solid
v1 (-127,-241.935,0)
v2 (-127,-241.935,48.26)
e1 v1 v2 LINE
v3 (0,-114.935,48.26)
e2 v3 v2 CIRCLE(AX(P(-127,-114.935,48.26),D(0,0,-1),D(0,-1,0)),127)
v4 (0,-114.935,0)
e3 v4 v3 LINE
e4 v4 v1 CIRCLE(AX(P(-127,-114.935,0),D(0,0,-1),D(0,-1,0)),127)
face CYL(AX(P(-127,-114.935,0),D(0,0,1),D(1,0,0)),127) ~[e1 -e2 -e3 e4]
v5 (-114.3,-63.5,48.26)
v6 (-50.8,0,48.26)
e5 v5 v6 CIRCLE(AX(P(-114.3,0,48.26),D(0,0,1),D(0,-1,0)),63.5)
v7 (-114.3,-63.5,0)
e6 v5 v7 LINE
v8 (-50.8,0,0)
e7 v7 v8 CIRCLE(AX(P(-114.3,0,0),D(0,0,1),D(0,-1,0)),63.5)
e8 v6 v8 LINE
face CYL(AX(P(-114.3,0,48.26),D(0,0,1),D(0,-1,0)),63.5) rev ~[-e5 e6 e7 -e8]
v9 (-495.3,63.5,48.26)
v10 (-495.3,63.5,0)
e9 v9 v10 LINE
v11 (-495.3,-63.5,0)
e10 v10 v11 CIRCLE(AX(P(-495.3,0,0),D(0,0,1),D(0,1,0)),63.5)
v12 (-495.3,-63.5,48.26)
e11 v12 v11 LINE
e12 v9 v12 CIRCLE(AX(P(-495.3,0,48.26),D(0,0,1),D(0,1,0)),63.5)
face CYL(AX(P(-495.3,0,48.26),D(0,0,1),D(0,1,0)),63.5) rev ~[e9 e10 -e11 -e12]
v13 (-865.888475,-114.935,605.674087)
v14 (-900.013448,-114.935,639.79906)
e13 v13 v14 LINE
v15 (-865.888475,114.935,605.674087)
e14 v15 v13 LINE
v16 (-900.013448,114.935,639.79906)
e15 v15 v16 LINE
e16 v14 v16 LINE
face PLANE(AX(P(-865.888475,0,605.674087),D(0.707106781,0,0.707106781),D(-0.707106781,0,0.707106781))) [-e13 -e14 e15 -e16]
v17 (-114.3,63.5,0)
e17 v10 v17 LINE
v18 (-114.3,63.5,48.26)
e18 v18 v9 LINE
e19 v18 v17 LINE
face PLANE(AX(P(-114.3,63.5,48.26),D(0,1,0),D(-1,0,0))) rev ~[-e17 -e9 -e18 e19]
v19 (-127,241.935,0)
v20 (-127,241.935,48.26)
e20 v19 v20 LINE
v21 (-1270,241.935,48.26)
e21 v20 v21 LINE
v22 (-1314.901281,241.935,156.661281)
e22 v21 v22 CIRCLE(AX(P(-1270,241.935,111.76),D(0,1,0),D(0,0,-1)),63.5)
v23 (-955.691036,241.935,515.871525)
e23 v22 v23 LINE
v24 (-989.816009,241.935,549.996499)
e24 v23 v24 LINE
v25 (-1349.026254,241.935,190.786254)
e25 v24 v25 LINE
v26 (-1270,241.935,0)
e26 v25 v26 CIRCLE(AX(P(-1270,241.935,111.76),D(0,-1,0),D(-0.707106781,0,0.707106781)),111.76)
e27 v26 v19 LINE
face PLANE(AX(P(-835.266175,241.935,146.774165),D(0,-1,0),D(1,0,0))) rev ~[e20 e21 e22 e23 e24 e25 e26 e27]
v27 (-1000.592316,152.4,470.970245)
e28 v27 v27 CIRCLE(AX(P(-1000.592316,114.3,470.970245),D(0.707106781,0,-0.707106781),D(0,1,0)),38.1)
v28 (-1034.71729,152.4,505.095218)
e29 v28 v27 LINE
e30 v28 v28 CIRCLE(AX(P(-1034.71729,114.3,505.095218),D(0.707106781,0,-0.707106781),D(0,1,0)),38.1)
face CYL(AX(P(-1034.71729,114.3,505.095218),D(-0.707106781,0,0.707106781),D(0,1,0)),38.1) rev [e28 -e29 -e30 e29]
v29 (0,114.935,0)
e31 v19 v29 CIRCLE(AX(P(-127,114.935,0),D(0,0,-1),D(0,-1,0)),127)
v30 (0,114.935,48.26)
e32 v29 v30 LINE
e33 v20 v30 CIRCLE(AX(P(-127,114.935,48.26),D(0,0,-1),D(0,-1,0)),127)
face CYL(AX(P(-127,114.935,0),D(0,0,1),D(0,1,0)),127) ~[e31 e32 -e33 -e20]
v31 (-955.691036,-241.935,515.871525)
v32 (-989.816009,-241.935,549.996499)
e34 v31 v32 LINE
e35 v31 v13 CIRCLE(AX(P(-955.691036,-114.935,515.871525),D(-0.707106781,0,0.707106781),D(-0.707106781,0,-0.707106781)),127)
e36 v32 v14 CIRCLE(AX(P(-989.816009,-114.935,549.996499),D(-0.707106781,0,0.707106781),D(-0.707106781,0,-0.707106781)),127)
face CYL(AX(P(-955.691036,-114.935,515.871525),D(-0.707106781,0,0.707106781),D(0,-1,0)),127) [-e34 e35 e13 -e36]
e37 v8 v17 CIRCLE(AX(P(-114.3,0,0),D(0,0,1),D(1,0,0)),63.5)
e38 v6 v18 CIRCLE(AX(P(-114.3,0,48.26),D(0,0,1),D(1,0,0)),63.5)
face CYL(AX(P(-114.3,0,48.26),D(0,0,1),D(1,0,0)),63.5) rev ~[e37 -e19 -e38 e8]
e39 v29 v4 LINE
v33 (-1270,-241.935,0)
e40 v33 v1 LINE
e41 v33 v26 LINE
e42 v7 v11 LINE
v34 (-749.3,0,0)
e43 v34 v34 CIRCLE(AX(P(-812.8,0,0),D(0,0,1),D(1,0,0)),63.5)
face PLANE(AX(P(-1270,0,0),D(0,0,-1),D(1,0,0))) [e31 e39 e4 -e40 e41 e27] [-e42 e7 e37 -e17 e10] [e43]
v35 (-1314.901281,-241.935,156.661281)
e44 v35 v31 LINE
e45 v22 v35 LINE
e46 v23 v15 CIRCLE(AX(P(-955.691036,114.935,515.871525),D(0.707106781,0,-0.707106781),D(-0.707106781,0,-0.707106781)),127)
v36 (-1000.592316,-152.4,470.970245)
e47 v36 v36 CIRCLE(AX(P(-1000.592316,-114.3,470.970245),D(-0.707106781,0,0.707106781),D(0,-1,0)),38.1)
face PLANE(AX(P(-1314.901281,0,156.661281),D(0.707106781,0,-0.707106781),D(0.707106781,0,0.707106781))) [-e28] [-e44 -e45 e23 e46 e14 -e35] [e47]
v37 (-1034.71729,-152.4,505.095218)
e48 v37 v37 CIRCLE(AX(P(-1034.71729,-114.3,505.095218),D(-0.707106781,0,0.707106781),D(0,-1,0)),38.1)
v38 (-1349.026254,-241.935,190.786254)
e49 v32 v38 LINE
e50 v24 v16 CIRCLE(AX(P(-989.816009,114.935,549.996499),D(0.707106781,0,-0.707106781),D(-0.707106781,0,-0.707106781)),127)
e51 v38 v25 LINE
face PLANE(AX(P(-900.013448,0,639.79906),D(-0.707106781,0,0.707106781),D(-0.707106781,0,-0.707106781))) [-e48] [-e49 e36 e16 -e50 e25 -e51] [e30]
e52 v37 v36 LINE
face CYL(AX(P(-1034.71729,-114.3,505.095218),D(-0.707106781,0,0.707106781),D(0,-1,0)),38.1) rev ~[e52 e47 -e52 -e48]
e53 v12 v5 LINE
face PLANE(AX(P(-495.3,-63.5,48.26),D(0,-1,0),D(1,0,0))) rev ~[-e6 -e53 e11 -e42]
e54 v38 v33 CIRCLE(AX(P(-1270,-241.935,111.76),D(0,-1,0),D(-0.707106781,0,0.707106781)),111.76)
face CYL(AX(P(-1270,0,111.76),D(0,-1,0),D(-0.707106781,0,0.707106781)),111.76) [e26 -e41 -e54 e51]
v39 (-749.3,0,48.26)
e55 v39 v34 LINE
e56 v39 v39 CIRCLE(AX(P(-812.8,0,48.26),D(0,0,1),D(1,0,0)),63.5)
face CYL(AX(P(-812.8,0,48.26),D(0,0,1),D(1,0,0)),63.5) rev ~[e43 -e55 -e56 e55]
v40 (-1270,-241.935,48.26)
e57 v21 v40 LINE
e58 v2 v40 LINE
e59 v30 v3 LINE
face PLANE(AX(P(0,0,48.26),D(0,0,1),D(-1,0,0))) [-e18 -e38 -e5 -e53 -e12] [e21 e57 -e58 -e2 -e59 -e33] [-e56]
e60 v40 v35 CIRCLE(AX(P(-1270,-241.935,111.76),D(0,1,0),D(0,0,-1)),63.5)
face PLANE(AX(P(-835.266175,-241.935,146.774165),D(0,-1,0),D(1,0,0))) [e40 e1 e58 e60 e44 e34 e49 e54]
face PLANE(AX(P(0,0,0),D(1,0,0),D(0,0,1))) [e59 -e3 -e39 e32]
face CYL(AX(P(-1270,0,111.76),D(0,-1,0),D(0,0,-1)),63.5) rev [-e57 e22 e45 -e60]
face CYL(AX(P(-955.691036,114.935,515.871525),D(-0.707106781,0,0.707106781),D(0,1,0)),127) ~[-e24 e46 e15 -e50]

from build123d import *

# Parameters (mm, degrees)
F1_DEPTH = 241.935
F2_R     = 63.5
F3_DEPTH = 48.261
F4_R     = 38.1
F5_DEPTH = 48.26
F6_R     = 127
F7_R     = 127


# Not quite as in the source:
# - a pattern or mirror of a feature is missing from the dataset's text; its kind, count and spacing are read off the source's solid


with BuildPart() as f1:
    # F0 (on Front) → F1 (new body, symmetric)
    with BuildSketch(Plane.XZ):
        with BuildLine():
            Line((-1270, 0), (0, 0))
            Line((0, 0), (0, 48.26))
            Line((0, 48.26), (-1270, 48.26))
            ThreePointArc((-1270, 48.26), (-1328.6663503145, 87.4596020448), (-1314.9012806053, 156.6612806053))
            Line((-1314.9012806053, 156.6612806053), (-865.8884745519, 605.6740866588))
            Line((-865.8884745519, 605.6740866588), (-900.013447812, 639.7990599189))
            Line((-900.013447812, 639.7990599189), (-1349.0262538654, 190.7862538654))
            ThreePointArc((-1349.0262538654, 190.7862538654), (-1373.2527765535, 68.9912995989), (-1270, 0))
        make_face()
    extrude(amount=F1_DEPTH, both=True)

    # F2 (on face) → F3 (cut, through all)
    with BuildSketch(Plane.XY.offset(48.26)):
        with Locations((-812.8, 0)):
            Circle(F2_R)
        with BuildLine():
            ThreePointArc((-495.3, -63.5), (-450.3987193947, -44.9012806053), (-431.8, 0))
            ThreePointArc((-431.8, 0), (-450.3987193947, 44.9012806053), (-495.3, 63.5))
            ThreePointArc((-495.3, 63.5), (-558.8, 0), (-495.3, -63.5))
        make_face()
        with BuildLine():
            ThreePointArc((-495.3, 63.5), (-450.3987193947, 44.9012806053), (-431.8, 0))
            ThreePointArc((-431.8, 0), (-450.3987193947, -44.9012806053), (-495.3, -63.5))
            Line((-495.3, -63.5), (-114.3, -63.5))
            ThreePointArc((-114.3, -63.5), (-177.8, 0), (-114.3, 63.5))
            Line((-114.3, 63.5), (-495.3, 63.5))
        make_face()
        with BuildLine():
            ThreePointArc((-50.8, 0), (-69.3987193947, 44.9012806053), (-114.3, 63.5))
            ThreePointArc((-114.3, 63.5), (-177.8, 0), (-114.3, -63.5))
            ThreePointArc((-114.3, -63.5), (-69.3987193947, -44.9012806053), (-50.8, 0))
        make_face()
    extrude(amount=-F3_DEPTH, mode=Mode.SUBTRACT)

    # F4 (on face) → F5 (cut, through all)
    with BuildSketch(Plane(origin=(-769.9062538654, 0, 769.9062538654), x_dir=(0, -1, 0), z_dir=(-0.7071067812, 0, 0.7071067812))):
        with Locations((114.3, -374.4993582415)):
            Circle(F4_R)
    f5 = extrude(amount=-F5_DEPTH, mode=Mode.SUBTRACT)

    # F5_copies: F5 across plane
    add(f5.mirror(Plane.ZX), mode=Mode.SUBTRACT)

    # F6
    f6_edges = [f1.edges().sort_by_distance(p)[0] for p in [
        (-882.950961, 241.935, 622.736573),
        (-882.950961, -241.935, 622.736573),
    ]]
    fillet(f6_edges, radius=F6_R)

    # F7
    f7_edges = [f1.edges().sort_by_distance(p)[0] for p in [
        (0, 241.935, 24.13),
        (0, -241.935, 24.13),
    ]]
    fillet(f7_edges, radius=F7_R)


solid = f1.part
